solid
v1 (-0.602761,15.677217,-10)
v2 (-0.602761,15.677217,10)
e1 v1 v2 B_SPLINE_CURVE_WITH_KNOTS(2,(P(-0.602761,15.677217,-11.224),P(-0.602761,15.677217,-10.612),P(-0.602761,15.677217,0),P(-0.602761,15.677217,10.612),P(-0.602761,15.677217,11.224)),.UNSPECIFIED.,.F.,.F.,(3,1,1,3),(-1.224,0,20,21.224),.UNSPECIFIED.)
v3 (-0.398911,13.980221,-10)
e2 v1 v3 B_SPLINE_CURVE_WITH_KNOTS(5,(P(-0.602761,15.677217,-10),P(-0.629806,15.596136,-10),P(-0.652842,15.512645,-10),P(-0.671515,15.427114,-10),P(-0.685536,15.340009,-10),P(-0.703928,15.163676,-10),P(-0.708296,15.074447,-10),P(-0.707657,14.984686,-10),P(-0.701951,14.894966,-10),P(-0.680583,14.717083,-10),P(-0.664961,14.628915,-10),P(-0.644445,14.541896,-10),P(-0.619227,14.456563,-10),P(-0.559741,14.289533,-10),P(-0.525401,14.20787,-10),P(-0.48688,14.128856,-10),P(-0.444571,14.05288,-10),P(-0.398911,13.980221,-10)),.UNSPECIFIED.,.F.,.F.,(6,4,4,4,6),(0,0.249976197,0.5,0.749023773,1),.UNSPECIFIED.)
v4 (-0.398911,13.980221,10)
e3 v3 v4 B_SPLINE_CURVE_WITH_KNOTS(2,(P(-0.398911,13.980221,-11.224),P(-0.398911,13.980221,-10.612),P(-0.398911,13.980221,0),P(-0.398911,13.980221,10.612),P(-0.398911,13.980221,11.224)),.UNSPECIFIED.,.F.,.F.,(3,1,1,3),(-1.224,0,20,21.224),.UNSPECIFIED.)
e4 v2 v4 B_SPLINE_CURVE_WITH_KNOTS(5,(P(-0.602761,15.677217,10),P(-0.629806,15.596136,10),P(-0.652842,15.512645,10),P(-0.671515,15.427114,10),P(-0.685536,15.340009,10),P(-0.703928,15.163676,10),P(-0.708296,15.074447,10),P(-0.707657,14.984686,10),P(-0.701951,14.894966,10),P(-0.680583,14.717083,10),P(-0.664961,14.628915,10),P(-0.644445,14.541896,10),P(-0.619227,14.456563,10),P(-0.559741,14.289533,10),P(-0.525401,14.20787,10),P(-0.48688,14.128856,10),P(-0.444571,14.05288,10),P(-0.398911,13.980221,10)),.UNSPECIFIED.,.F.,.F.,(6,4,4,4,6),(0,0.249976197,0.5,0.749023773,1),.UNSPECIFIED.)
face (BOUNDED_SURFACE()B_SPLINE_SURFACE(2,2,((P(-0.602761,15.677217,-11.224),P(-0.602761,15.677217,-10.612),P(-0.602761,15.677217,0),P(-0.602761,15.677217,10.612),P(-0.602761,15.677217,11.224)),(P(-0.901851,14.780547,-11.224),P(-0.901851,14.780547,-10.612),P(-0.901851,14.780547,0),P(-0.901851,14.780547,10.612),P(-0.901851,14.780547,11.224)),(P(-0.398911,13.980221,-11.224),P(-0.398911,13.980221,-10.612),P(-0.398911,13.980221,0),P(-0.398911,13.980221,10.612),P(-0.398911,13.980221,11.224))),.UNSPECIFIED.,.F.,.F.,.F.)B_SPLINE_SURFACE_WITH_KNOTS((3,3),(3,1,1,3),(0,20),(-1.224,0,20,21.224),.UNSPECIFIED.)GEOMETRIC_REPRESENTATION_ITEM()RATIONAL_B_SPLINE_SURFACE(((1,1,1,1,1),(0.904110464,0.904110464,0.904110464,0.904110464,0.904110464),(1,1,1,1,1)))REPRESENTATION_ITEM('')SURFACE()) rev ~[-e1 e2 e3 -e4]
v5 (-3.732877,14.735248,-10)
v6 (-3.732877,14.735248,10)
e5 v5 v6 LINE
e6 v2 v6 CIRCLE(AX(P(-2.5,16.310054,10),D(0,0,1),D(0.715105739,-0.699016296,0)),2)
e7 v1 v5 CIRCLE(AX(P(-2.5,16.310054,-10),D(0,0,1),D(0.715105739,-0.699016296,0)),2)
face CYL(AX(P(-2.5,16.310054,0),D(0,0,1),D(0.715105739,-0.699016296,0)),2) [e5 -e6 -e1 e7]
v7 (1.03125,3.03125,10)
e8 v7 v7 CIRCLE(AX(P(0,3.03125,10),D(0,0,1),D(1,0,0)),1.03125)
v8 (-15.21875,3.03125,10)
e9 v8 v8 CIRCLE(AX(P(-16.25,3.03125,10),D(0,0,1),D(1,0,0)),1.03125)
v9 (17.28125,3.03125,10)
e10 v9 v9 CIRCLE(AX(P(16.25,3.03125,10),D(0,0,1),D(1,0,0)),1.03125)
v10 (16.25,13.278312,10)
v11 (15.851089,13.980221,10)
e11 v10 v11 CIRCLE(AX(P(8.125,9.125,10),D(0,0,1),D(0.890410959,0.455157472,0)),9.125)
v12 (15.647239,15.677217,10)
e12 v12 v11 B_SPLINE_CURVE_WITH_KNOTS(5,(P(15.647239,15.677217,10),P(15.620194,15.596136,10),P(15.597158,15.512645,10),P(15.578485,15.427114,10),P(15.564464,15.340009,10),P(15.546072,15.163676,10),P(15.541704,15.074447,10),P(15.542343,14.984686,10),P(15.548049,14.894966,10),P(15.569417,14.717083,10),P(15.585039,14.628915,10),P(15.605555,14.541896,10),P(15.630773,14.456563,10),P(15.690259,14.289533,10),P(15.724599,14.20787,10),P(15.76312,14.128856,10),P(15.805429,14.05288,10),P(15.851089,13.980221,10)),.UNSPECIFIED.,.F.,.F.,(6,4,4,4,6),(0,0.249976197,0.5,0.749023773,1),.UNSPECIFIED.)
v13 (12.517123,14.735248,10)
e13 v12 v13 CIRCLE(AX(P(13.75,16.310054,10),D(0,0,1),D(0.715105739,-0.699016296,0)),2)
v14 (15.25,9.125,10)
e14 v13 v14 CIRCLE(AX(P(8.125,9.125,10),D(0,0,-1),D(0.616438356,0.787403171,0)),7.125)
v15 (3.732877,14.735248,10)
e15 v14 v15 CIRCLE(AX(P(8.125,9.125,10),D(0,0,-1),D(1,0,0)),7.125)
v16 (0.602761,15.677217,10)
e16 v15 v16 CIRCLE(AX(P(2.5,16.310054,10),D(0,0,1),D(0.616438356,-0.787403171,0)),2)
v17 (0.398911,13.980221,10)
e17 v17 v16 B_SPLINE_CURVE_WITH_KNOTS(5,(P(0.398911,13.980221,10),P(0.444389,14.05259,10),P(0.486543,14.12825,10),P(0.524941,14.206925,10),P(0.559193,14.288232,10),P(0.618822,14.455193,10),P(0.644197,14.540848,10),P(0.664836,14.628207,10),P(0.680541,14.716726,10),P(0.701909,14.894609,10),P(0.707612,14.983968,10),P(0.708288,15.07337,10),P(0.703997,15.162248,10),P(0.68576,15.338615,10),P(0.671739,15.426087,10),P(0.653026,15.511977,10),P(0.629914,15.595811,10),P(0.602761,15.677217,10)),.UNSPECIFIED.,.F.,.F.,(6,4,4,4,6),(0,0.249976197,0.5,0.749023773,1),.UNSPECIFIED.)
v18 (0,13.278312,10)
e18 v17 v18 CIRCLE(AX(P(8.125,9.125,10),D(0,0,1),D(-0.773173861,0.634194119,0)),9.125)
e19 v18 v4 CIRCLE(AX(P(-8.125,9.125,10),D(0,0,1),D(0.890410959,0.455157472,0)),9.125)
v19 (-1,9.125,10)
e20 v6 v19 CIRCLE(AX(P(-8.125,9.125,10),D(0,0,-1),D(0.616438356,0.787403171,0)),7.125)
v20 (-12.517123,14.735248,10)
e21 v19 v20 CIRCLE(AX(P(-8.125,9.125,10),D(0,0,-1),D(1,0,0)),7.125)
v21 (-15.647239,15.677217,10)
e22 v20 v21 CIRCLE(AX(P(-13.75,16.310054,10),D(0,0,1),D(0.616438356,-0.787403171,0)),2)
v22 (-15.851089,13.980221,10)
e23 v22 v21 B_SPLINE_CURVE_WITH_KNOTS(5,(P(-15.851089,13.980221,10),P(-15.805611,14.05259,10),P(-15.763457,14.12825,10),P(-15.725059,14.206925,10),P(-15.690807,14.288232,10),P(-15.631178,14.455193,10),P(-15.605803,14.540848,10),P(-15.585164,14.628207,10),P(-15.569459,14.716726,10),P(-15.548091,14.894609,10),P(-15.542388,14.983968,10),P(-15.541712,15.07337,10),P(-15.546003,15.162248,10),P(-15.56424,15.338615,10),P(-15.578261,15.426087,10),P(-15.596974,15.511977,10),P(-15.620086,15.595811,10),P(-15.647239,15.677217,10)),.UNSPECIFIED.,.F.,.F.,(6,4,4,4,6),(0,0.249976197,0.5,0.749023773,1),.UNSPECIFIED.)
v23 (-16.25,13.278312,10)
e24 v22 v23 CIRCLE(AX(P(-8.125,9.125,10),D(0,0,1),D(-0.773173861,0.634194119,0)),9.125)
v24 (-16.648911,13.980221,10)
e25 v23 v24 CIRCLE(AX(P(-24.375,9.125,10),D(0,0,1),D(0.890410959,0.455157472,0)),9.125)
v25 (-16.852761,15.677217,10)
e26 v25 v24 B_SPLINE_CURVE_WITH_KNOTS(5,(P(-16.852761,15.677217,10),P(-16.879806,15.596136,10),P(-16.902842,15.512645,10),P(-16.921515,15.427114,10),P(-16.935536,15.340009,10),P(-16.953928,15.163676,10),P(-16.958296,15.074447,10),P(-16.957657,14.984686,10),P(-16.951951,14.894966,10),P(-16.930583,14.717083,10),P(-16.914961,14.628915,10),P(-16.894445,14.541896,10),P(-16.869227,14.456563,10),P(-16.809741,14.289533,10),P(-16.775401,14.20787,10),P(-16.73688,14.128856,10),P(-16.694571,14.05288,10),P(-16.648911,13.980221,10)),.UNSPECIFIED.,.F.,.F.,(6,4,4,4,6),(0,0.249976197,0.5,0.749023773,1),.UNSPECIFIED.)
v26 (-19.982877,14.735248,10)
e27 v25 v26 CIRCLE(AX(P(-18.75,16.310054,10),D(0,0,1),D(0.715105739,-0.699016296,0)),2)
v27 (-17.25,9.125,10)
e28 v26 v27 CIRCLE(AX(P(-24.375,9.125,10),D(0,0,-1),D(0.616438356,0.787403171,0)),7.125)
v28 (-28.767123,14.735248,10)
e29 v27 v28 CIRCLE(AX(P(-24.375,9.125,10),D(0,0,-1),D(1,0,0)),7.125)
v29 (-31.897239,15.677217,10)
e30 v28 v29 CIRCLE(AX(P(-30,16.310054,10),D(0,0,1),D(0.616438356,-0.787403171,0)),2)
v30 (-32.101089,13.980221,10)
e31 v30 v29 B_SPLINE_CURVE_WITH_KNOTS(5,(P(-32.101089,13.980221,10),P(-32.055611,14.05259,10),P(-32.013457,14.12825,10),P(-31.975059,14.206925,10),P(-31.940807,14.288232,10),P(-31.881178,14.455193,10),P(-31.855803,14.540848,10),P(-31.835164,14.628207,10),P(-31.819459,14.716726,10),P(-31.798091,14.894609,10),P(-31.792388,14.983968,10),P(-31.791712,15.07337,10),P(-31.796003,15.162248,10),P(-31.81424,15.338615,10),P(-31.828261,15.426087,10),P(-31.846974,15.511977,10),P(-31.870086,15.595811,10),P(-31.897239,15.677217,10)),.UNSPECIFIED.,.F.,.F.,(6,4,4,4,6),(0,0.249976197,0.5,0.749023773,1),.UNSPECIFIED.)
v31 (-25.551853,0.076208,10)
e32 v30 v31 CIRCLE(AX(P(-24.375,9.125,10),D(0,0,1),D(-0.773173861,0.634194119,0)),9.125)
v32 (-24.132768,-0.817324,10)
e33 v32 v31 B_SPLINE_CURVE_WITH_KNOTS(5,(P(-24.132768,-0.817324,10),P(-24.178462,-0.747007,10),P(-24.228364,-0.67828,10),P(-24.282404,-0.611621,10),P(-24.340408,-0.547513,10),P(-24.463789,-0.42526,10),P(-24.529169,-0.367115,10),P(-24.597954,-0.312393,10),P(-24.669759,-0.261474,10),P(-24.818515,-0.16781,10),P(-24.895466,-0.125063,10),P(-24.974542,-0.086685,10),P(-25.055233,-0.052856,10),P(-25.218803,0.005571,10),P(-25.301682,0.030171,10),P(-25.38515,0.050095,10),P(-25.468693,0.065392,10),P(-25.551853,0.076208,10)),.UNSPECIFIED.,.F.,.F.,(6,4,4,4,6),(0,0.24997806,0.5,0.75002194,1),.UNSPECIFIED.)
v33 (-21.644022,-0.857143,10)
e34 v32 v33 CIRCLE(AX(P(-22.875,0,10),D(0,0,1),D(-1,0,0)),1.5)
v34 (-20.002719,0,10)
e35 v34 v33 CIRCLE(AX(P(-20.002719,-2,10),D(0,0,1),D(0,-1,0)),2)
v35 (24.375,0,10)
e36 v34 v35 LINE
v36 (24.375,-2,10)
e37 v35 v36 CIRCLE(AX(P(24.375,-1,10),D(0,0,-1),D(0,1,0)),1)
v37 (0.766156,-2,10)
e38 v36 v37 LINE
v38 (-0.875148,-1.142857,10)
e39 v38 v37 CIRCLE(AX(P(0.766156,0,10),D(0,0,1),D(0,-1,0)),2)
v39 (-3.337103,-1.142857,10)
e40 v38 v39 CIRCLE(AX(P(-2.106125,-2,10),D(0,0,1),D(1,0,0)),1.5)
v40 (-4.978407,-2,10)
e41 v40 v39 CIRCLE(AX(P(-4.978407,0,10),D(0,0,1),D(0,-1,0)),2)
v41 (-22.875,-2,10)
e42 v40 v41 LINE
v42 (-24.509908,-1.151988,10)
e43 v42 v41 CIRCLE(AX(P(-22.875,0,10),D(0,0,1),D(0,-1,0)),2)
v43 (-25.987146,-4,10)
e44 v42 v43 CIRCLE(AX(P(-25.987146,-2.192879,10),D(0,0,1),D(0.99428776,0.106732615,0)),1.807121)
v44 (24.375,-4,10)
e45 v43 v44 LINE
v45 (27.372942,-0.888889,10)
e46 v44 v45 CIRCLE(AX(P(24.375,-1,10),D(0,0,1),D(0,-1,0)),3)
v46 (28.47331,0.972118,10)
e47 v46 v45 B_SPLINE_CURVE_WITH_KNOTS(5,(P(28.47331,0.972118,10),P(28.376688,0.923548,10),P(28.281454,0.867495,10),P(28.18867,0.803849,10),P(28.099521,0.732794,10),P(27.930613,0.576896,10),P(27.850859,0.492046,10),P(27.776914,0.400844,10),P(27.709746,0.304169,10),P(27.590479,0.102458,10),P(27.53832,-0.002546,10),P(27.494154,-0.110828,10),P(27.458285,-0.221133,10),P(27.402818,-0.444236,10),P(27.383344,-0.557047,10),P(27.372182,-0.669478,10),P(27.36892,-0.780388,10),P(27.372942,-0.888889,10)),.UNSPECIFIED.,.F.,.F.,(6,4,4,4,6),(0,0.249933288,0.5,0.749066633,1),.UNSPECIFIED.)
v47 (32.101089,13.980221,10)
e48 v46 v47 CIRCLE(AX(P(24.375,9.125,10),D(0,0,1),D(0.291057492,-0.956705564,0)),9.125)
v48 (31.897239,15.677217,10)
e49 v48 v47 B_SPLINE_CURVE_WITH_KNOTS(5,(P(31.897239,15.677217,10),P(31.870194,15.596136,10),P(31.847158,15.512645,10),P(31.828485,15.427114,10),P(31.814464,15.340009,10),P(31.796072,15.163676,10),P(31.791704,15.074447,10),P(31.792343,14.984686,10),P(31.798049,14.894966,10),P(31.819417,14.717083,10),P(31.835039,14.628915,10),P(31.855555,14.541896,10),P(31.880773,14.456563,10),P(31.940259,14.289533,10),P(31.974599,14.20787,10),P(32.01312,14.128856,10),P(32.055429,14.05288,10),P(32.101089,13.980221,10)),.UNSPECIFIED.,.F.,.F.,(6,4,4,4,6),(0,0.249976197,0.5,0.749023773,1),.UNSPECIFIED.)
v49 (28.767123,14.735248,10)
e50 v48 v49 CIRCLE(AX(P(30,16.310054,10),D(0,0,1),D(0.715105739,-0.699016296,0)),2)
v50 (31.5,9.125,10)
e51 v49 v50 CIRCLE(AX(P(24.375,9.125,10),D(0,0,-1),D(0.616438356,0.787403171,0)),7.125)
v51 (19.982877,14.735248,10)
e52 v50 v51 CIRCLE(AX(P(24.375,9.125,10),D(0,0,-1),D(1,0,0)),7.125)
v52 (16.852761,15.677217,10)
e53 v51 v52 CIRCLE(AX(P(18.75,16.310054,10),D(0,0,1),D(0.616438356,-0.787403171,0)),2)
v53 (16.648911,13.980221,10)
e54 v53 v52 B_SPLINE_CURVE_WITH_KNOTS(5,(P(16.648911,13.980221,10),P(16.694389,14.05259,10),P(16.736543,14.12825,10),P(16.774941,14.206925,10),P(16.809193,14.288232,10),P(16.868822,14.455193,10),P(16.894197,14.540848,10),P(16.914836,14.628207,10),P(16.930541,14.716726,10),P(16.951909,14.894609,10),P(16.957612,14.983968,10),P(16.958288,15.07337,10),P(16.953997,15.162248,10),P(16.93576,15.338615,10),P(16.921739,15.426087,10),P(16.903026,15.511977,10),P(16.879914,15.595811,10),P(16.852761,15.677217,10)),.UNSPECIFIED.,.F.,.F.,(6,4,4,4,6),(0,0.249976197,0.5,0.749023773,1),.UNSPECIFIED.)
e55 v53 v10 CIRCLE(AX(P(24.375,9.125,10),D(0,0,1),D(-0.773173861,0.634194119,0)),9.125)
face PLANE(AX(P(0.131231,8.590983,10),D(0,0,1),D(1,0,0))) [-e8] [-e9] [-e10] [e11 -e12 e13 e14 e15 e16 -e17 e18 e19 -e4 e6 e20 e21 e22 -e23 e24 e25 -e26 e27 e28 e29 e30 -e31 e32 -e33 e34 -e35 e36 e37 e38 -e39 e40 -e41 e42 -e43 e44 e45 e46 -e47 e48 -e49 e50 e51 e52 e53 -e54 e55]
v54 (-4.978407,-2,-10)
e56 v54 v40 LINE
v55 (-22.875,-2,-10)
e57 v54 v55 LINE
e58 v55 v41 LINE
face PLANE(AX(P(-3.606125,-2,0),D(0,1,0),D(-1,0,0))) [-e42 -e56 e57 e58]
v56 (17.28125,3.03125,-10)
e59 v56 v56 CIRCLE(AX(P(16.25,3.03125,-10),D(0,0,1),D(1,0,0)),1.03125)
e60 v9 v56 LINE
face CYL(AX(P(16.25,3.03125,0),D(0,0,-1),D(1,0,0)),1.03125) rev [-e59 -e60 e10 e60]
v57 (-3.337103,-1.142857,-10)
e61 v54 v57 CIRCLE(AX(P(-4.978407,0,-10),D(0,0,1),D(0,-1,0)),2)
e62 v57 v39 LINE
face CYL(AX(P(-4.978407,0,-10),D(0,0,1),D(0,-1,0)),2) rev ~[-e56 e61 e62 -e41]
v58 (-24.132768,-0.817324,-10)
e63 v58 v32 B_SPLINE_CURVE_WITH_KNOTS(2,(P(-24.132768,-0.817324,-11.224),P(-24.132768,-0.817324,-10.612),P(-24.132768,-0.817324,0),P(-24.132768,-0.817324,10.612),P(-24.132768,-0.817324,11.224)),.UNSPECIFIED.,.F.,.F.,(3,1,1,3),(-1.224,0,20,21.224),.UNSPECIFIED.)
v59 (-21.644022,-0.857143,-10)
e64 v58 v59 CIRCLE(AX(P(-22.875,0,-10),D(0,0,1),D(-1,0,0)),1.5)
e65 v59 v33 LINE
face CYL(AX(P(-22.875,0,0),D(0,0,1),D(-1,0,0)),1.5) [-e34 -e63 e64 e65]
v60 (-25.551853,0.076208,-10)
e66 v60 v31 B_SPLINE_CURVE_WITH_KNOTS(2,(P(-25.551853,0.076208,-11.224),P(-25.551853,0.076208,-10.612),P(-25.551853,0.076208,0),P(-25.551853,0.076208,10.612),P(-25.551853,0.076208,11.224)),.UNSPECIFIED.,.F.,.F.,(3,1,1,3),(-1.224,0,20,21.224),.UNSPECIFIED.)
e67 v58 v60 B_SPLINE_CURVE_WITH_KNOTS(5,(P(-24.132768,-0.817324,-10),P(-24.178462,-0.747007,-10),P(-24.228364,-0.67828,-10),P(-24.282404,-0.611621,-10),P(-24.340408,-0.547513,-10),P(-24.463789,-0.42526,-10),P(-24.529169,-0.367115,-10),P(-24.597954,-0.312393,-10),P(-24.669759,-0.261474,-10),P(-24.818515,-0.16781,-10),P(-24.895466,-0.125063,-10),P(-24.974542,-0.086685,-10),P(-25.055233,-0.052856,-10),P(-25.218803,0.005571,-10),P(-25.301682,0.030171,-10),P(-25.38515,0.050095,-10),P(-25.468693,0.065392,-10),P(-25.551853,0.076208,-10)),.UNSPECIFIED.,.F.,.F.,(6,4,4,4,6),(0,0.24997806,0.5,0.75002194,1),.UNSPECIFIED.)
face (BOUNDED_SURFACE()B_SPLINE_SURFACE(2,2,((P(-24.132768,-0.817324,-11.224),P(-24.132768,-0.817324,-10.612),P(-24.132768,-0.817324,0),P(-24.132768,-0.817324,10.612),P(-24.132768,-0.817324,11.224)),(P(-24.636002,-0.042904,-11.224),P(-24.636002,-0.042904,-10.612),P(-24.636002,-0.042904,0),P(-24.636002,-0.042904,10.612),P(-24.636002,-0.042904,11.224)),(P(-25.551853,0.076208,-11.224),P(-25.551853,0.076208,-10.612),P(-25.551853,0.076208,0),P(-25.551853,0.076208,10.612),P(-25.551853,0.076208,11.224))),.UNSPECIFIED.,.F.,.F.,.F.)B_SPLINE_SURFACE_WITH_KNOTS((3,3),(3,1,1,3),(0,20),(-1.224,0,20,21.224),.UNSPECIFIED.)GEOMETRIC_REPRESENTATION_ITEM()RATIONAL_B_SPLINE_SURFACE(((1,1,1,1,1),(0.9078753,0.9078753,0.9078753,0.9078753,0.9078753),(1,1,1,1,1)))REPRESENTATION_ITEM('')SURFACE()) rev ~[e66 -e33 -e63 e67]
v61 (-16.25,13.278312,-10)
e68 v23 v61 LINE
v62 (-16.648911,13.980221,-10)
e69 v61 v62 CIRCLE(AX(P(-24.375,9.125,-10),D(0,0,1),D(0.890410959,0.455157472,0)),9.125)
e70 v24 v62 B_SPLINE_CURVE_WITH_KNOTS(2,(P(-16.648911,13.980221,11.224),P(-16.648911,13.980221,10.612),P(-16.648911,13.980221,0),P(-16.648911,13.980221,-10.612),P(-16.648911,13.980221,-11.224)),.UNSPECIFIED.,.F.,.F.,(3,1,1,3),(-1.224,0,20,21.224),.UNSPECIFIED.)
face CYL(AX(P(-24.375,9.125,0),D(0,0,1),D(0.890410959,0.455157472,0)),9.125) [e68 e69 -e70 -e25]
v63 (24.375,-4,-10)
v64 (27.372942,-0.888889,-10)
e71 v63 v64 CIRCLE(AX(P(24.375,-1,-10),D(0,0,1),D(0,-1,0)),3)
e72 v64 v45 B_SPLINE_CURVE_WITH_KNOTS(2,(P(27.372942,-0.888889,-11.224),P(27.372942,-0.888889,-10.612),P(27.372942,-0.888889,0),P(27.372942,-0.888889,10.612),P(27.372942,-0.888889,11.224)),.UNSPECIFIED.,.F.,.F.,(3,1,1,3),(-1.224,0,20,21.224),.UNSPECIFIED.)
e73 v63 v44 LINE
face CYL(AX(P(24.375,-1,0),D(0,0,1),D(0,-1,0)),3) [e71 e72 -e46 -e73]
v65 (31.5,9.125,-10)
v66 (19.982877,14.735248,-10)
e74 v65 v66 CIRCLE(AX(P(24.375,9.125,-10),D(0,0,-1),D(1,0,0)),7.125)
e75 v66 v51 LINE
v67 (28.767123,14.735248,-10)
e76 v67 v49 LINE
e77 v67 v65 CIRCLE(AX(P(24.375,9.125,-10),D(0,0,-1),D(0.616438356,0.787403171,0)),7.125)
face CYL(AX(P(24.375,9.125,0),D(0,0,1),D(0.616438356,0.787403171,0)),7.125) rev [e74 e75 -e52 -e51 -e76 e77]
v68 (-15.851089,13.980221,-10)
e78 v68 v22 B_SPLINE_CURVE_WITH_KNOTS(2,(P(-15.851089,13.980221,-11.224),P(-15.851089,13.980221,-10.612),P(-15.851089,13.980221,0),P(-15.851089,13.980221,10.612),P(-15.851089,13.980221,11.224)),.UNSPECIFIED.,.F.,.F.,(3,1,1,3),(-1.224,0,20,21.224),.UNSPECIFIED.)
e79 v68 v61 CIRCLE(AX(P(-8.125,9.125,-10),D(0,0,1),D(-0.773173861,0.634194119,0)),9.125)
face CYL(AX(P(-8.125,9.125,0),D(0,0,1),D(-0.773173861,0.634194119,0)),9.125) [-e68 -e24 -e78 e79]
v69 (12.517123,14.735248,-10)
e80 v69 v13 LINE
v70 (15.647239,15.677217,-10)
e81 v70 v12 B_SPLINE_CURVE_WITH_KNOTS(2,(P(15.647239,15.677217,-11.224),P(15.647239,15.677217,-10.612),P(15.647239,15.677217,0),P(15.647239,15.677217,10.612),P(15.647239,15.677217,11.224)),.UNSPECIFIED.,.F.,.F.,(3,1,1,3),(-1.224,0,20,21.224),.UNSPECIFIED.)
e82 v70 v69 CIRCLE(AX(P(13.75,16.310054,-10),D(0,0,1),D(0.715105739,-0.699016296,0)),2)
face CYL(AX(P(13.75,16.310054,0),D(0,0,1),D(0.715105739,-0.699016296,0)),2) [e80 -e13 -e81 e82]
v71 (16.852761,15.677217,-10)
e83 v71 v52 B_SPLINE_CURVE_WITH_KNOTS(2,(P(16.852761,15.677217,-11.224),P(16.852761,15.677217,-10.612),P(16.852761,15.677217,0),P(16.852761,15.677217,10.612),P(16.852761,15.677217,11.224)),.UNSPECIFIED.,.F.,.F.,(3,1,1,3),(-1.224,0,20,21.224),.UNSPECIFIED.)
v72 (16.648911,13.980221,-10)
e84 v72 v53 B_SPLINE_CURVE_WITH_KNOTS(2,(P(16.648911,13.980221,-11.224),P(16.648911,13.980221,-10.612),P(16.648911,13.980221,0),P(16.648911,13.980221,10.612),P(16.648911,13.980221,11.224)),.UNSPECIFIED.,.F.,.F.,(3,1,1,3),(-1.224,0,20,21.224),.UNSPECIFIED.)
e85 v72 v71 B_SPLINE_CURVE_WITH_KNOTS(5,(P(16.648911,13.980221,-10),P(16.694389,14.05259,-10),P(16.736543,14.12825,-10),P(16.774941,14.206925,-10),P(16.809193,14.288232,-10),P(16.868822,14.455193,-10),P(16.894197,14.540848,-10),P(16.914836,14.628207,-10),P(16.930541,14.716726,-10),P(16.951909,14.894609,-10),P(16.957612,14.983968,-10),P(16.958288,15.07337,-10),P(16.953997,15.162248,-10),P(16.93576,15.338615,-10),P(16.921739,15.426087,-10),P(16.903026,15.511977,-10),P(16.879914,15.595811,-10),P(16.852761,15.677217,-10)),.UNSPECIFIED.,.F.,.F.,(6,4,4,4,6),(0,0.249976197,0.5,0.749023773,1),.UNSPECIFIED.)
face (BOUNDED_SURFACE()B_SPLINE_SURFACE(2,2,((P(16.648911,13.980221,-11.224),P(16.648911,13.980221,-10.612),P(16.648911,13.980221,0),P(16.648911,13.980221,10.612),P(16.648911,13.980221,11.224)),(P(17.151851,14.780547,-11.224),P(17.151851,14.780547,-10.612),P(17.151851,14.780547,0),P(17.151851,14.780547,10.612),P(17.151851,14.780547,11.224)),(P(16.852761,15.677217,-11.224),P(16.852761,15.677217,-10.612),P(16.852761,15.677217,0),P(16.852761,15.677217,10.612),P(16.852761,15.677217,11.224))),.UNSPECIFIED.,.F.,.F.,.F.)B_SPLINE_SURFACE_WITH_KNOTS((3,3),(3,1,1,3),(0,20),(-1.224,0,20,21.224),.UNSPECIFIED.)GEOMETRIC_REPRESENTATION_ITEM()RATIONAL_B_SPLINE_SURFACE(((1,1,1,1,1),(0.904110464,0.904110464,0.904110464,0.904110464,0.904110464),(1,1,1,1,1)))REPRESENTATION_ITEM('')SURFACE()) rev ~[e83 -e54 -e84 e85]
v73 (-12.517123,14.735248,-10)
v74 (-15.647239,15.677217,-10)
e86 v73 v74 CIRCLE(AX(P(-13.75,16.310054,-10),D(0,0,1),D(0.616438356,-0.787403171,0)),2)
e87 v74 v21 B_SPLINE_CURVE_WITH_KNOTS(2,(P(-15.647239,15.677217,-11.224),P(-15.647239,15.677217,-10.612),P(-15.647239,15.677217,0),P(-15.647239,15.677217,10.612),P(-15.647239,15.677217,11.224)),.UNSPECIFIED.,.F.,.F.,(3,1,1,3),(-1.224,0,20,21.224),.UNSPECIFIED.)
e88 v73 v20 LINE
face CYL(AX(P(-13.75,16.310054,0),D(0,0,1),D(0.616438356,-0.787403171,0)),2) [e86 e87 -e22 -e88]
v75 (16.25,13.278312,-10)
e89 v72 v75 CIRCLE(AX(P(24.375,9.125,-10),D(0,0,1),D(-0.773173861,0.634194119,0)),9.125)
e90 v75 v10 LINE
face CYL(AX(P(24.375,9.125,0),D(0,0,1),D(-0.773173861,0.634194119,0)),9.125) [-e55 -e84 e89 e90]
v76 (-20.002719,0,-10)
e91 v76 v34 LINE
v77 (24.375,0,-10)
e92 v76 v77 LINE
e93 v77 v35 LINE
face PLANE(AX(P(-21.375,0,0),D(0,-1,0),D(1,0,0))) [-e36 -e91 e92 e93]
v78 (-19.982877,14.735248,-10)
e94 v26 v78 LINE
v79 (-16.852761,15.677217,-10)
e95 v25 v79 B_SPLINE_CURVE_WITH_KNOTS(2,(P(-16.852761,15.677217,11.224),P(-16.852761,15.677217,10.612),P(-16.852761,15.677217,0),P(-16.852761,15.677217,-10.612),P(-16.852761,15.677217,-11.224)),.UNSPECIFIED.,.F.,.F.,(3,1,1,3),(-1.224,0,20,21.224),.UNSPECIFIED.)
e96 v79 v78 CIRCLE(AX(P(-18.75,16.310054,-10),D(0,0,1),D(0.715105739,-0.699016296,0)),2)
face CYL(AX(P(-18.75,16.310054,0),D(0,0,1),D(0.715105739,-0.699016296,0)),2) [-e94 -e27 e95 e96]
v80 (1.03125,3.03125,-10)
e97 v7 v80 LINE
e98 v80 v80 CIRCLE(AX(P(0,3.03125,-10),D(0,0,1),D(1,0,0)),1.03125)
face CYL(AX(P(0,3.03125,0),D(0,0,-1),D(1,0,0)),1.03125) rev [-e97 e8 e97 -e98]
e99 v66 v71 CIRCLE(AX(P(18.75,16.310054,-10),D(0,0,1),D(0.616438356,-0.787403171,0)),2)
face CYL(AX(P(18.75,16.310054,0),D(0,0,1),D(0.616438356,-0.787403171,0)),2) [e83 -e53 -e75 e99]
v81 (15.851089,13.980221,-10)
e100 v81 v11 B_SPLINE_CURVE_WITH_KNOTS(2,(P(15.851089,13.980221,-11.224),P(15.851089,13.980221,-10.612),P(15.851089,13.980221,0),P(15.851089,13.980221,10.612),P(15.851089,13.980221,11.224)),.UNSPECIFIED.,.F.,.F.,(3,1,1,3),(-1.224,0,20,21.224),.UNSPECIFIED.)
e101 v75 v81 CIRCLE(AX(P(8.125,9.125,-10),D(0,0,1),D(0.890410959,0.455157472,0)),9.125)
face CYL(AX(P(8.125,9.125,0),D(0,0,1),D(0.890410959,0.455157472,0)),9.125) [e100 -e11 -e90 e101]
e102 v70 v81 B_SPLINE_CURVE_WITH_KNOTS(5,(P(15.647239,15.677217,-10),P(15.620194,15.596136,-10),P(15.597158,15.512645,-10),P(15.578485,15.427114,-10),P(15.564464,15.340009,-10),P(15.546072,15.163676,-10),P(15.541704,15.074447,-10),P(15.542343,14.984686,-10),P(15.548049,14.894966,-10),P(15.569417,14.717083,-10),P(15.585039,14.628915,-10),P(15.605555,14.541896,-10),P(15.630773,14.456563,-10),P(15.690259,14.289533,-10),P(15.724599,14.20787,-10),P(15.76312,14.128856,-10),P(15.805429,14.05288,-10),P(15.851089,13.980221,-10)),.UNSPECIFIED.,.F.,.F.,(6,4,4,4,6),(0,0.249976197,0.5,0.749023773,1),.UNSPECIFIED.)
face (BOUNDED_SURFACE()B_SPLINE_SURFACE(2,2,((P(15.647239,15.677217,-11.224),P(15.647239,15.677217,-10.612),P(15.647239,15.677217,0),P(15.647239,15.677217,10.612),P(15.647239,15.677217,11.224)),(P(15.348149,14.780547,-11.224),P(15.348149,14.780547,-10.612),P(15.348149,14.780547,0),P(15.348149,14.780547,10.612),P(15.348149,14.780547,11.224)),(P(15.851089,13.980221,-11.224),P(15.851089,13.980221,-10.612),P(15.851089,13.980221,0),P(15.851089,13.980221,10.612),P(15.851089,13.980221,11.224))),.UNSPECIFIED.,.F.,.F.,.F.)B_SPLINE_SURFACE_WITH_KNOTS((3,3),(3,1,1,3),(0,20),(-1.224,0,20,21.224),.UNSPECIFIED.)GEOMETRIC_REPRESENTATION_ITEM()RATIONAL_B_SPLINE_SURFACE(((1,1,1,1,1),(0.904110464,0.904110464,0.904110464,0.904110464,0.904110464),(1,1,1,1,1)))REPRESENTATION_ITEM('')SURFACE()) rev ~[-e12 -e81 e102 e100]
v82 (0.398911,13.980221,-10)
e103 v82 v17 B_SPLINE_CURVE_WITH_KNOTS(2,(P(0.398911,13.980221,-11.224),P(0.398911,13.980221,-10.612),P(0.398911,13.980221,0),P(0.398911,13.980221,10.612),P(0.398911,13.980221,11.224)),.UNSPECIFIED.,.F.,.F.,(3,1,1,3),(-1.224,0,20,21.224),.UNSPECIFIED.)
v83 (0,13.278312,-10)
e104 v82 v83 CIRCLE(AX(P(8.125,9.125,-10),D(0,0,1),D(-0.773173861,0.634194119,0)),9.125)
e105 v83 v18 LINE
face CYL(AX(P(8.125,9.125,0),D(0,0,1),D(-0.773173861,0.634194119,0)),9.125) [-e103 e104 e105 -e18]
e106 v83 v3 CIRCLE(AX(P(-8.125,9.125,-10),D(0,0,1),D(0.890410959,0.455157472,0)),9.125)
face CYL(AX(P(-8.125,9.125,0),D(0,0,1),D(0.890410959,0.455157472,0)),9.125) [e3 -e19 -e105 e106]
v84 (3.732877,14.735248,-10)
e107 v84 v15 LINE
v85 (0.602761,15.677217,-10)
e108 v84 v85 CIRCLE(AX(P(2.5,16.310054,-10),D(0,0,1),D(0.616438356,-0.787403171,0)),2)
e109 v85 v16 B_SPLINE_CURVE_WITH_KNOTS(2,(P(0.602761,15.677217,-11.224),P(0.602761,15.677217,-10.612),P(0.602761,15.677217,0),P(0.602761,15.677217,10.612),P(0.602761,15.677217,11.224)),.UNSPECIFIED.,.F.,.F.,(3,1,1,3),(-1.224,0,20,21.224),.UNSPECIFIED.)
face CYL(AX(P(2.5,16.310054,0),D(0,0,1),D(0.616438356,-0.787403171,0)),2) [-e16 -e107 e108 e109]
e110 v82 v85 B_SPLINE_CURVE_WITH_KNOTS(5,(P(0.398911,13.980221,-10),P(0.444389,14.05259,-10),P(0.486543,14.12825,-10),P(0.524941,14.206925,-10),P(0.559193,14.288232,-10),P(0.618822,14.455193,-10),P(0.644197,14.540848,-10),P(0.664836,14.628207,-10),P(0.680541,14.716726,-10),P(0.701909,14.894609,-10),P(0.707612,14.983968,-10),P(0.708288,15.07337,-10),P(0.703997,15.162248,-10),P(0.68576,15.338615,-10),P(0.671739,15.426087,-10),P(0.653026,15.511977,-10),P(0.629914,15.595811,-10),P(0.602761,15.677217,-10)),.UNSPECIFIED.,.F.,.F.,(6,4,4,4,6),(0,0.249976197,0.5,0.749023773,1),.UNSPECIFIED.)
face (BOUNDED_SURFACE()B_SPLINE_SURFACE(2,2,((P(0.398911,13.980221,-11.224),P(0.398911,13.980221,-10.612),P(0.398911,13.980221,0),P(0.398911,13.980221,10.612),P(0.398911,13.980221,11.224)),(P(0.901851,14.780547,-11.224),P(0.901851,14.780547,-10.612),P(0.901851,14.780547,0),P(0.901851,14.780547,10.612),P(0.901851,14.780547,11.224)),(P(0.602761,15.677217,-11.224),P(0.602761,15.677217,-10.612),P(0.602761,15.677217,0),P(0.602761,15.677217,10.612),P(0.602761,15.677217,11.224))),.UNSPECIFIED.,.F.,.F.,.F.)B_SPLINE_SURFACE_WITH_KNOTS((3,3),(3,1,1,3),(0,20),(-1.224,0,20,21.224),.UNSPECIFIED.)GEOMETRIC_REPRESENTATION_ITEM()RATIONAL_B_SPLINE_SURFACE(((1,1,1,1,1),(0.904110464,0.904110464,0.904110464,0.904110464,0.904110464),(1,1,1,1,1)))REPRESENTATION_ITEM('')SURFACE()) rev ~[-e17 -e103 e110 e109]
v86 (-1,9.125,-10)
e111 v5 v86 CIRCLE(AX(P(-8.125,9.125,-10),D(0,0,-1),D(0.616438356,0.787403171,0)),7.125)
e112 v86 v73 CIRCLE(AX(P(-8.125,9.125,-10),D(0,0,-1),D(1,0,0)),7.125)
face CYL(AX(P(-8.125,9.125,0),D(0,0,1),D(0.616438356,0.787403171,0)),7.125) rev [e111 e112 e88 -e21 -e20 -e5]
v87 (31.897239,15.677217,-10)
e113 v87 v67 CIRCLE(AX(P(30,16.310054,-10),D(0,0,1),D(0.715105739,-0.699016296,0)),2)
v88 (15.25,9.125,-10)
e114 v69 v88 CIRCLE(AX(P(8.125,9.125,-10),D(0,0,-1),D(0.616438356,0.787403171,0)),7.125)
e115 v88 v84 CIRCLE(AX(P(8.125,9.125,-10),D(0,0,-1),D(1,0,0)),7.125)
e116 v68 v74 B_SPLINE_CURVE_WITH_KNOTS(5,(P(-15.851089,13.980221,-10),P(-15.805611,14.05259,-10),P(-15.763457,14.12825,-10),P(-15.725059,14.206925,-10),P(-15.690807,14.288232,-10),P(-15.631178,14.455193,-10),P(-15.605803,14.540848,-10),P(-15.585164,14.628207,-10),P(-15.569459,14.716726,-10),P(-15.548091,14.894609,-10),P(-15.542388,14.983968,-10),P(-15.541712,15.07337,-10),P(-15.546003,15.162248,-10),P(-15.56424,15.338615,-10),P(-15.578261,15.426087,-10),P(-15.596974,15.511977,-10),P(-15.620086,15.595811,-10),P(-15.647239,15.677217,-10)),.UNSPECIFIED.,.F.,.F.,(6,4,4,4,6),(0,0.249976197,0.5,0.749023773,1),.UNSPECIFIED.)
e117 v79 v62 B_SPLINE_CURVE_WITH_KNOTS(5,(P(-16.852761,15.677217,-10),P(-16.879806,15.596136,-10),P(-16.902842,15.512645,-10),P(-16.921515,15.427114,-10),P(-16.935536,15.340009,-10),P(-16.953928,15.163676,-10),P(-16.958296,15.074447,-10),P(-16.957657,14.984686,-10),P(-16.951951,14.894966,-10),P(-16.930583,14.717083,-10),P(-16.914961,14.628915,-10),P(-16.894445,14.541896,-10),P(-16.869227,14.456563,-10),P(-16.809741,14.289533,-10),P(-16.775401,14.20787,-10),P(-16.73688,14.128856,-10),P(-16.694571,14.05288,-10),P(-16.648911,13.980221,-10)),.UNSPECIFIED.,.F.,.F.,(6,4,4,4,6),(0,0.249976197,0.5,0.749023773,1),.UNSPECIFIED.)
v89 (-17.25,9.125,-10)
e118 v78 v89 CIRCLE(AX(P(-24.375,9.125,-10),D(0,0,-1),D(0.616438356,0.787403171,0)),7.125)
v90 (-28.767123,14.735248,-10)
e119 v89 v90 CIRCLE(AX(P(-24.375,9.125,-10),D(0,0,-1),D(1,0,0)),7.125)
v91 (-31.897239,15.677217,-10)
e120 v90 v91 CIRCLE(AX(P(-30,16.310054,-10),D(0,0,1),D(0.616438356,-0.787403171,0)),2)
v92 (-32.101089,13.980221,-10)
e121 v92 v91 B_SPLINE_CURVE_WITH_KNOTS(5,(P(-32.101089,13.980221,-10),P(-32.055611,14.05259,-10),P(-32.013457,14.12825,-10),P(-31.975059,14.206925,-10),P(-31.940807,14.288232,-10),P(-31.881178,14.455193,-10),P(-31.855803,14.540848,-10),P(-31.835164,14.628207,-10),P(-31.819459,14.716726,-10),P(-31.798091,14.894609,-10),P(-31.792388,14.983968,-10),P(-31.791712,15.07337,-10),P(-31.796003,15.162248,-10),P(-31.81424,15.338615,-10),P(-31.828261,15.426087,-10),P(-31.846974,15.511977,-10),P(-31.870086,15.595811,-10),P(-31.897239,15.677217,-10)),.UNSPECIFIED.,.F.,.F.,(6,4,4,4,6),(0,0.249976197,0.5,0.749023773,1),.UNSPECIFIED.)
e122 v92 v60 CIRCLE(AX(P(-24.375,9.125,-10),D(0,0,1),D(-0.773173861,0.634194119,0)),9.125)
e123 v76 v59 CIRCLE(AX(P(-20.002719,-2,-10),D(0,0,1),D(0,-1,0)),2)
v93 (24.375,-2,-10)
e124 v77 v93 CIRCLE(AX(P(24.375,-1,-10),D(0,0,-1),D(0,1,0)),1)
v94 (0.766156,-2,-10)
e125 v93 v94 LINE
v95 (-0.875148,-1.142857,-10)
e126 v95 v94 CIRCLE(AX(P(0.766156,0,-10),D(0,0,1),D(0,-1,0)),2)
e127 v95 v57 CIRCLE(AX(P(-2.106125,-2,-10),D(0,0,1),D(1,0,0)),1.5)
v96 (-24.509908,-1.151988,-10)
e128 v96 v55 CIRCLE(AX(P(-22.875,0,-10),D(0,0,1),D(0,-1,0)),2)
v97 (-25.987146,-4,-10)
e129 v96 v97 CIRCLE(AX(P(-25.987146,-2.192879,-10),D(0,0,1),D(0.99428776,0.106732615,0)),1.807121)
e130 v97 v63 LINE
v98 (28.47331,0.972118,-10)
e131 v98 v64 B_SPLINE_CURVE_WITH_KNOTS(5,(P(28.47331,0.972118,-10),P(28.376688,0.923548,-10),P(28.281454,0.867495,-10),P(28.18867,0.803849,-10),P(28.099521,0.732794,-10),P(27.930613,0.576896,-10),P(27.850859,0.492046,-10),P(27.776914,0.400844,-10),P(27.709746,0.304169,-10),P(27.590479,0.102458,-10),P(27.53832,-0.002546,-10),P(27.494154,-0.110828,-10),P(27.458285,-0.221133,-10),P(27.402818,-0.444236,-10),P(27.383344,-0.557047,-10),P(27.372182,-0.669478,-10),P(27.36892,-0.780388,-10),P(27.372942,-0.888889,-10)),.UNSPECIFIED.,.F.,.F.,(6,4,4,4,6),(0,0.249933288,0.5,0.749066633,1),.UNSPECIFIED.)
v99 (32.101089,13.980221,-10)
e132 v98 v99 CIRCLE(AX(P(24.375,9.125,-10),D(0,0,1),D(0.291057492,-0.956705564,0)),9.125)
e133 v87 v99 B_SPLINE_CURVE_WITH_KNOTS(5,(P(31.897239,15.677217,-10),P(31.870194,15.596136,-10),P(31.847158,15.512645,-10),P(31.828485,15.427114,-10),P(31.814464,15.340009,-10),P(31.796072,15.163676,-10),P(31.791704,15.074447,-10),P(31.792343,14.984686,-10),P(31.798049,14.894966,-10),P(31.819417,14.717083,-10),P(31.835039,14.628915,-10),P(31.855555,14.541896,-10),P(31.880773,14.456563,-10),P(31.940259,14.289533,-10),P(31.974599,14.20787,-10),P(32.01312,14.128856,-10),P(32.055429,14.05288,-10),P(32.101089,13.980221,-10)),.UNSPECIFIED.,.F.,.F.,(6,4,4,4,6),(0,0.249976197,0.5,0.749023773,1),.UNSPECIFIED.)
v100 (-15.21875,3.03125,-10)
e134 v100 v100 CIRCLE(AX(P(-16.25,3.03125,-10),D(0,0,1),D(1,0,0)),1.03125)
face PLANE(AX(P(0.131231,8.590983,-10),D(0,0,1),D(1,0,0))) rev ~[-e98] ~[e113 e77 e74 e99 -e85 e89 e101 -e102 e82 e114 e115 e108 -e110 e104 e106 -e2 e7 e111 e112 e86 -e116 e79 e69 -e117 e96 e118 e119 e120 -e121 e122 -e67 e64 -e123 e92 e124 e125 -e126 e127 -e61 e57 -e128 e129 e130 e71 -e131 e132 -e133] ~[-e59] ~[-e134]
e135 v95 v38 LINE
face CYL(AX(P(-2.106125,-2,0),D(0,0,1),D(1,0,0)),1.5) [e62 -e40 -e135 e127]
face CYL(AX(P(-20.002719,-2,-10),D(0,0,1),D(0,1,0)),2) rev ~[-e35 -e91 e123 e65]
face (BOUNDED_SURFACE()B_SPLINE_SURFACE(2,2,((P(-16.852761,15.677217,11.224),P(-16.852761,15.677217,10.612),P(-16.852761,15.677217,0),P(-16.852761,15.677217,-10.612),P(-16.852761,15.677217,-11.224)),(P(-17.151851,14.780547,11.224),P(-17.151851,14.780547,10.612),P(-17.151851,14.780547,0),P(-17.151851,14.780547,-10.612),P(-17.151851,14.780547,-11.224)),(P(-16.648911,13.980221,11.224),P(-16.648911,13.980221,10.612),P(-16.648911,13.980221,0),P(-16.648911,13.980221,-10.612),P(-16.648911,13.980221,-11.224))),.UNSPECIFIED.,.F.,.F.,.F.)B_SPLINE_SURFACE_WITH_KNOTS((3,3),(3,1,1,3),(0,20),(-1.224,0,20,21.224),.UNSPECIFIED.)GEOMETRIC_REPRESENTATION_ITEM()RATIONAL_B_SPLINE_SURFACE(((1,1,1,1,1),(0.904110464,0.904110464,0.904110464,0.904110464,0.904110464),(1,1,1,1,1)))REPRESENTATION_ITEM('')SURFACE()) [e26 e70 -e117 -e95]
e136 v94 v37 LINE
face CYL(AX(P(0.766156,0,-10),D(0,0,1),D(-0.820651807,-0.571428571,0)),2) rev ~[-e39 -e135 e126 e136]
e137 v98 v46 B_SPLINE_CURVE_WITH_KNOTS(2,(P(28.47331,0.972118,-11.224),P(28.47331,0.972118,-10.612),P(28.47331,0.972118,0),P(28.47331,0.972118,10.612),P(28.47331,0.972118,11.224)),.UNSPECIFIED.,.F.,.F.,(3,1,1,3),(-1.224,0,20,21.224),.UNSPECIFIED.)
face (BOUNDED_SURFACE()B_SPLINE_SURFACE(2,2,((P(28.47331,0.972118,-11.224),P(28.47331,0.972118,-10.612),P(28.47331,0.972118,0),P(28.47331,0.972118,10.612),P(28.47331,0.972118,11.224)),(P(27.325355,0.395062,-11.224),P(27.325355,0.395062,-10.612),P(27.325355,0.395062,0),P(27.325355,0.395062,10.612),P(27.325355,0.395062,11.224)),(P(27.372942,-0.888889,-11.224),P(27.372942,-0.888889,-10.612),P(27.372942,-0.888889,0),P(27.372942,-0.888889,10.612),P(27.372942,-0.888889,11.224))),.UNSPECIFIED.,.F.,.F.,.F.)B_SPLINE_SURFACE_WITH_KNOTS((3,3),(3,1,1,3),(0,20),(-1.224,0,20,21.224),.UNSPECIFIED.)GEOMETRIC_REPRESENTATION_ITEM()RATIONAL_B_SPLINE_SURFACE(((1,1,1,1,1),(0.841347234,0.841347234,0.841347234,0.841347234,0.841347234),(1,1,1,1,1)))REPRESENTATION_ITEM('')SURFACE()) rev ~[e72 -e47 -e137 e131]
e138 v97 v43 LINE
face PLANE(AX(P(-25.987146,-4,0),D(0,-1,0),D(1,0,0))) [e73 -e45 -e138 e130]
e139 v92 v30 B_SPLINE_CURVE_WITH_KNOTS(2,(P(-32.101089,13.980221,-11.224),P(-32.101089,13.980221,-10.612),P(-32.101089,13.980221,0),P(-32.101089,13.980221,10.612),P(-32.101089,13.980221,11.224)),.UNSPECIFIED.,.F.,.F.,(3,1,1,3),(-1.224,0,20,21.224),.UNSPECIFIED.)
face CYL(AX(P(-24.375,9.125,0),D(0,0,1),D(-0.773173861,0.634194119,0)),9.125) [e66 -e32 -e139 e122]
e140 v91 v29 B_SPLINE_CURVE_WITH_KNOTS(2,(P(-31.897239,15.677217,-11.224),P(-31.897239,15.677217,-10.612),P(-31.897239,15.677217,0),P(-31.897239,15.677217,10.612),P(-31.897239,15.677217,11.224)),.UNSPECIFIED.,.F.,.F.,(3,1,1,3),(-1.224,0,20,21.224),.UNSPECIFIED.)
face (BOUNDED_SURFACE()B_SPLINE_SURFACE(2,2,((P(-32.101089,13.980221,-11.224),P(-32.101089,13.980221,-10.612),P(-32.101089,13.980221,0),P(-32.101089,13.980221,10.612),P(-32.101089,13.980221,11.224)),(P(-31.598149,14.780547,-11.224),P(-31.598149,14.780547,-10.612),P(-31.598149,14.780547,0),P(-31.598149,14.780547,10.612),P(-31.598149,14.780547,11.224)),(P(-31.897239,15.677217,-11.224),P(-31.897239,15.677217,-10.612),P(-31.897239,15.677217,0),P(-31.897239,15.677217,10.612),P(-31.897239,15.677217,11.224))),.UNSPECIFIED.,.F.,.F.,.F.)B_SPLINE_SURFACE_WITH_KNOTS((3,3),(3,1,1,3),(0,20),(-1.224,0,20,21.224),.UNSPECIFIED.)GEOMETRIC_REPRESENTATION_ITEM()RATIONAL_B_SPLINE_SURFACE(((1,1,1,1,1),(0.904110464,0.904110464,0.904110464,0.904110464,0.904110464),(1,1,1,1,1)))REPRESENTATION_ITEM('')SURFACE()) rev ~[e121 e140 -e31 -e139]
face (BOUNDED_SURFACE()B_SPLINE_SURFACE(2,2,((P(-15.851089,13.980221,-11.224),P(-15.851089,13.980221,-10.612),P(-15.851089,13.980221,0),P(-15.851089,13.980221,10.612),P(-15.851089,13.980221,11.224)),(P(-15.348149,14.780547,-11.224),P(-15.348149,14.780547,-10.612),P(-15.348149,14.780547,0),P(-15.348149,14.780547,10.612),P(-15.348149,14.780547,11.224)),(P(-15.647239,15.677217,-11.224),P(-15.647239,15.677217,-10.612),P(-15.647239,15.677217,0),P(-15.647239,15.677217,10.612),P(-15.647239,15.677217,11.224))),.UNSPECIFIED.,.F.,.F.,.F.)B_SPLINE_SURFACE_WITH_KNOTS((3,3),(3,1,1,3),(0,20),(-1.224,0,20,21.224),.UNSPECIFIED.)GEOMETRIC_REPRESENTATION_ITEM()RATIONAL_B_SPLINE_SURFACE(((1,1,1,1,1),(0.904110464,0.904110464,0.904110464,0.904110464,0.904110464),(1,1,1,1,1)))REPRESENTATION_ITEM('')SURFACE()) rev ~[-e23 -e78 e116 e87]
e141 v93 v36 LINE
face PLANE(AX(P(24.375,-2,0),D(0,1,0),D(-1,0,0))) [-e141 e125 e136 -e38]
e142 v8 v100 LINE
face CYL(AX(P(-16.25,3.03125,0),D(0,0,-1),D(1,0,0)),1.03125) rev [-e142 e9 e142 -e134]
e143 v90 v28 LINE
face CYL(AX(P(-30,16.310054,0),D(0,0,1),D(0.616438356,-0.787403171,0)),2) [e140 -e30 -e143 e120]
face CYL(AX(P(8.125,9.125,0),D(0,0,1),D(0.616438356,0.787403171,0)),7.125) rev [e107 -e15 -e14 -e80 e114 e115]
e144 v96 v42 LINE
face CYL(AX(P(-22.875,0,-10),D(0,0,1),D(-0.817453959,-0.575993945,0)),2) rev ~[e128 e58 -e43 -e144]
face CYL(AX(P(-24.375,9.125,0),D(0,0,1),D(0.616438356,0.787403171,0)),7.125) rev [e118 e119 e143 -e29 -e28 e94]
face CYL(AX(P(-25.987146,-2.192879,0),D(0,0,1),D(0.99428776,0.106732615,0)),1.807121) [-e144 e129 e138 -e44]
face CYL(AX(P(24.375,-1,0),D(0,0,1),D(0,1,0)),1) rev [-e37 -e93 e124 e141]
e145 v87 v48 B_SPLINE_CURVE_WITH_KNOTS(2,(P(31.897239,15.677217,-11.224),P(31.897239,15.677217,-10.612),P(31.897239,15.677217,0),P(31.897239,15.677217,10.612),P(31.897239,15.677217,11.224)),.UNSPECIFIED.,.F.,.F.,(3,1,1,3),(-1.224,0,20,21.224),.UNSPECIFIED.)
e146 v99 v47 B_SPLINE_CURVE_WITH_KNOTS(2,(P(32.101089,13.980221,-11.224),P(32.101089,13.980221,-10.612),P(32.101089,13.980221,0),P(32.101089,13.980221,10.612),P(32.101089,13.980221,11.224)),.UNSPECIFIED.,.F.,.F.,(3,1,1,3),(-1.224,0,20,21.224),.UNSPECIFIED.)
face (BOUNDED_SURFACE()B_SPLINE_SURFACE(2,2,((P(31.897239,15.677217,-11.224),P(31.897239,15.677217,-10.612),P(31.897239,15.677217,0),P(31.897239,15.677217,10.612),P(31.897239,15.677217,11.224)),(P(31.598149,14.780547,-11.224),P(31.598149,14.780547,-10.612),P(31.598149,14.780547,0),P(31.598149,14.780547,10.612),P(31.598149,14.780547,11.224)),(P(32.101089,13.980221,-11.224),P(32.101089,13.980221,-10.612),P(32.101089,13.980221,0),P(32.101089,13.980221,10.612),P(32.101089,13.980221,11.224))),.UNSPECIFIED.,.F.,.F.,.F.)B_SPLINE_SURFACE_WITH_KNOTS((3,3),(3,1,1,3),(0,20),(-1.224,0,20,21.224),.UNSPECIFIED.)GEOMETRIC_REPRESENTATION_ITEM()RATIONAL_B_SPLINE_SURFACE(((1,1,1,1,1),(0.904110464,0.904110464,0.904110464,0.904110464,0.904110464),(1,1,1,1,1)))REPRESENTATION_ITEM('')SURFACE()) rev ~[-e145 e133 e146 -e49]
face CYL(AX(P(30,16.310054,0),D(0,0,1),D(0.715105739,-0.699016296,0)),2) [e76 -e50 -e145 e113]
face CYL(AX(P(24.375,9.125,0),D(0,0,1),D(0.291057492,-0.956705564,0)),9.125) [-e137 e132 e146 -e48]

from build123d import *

# Parameters (mm, degrees)
F1_R     = 1.03125
F2_DEPTH = 10
F3_R     = 2


with BuildPart() as f2:
    # F1 (on Top) → F2 (new body, symmetric)
    with BuildSketch(Plane.XY):
        with BuildLine():
            ThreePointArc((-19.9828767123, 14.7352475904), (-17.9695529655, 12.2452360949), (-17.25, 9.125))
            ThreePointArc((-17.25, 9.125), (-27.4952360949, 2.7195529655), (-28.7671232877, 14.7352475904))
            ThreePointArc((-28.7671232877, 14.7352475904), (-29.8675330526, 18.3056622368), (-31.4302114786, 14.9120213402))
            ThreePointArc((-31.4302114786, 14.9120213402), (-32.6233996851, 5.2224972601), (-24.375, 0))
            Line((-24.375, 0), (-21.375, 0))
            Line((-21.375, 0), (24.375, 0))
            ThreePointArc((24.375, 0), (25.7175606637, 0.099305796), (27.0308996167, 0.3950617284))
            ThreePointArc((27.0308996167, 0.3950617284), (33.107808756, 6.4785540378), (31.4302114786, 14.9120213402))
            ThreePointArc((31.4302114786, 14.9120213402), (29.8675330526, 18.3056622368), (28.7671232877, 14.7352475904))
            ThreePointArc((28.7671232877, 14.7352475904), (30.7804470345, 12.2452360949), (31.5, 9.125))
            ThreePointArc((31.5, 9.125), (21.2547639051, 2.7195529655), (19.9828767123, 14.7352475904))
            ThreePointArc((19.9828767123, 14.7352475904), (18.8824669474, 18.3056622368), (17.3197885214, 14.9120213402))
            ThreePointArc((17.3197885214, 14.9120213402), (16.7410654482, 14.1238666974), (16.25, 13.2783119315))
            ThreePointArc((16.25, 13.2783119315), (15.7589345518, 14.1238666974), (15.1802114786, 14.9120213402))
            ThreePointArc((15.1802114786, 14.9120213402), (13.6175330526, 18.3056622368), (12.5171232877, 14.7352475904))
            ThreePointArc((12.5171232877, 14.7352475904), (14.5304470345, 12.2452360949), (15.25, 9.125))
            ThreePointArc((15.25, 9.125), (5.0047639051, 2.7195529655), (3.7328767123, 14.7352475904))
            ThreePointArc((3.7328767123, 14.7352475904), (2.6324669474, 18.3056622368), (1.0697885214, 14.9120213402))
            ThreePointArc((1.0697885214, 14.9120213402), (0.4910654482, 14.1238666974), (0, 13.2783119315))
            ThreePointArc((0, 13.2783119315), (-0.4910654482, 14.1238666974), (-1.0697885214, 14.9120213402))
            ThreePointArc((-1.0697885214, 14.9120213402), (-2.6324669474, 18.3056622368), (-3.7328767123, 14.7352475904))
            ThreePointArc((-3.7328767123, 14.7352475904), (-1.7195529655, 12.2452360949), (-1, 9.125))
            ThreePointArc((-1, 9.125), (-11.2452360949, 2.7195529655), (-12.5171232877, 14.7352475904))
            ThreePointArc((-12.5171232877, 14.7352475904), (-13.6175330526, 18.3056622368), (-15.1802114786, 14.9120213402))
            ThreePointArc((-15.1802114786, 14.9120213402), (-15.7589345518, 14.1238666974), (-16.25, 13.2783119315))
            ThreePointArc((-16.25, 13.2783119315), (-16.7410654482, 14.1238666974), (-17.3197885214, 14.9120213402))
            ThreePointArc((-17.3197885214, 14.9120213402), (-18.8824669474, 18.3056622368), (-19.9828767123, 14.7352475904))
        make_face()
        with Locations((-16.25, 3.03125)):
            Circle(F1_R, mode=Mode.SUBTRACT)
        with Locations((0, 3.03125)):
            Circle(F1_R, mode=Mode.SUBTRACT)
        with Locations((16.25, 3.03125)):
            Circle(F1_R, mode=Mode.SUBTRACT)
        with BuildLine():
            ThreePointArc((27.0308996167, 0.3950617284), (25.7175606637, 0.099305796), (24.375, 0))
            ThreePointArc((24.375, 0), (25.375, -1), (24.375, -2))
            Line((24.375, -2), (-0.6061253537, -2))
            Line((-0.6061253537, -2), (-3.6061253537, -2))
            Line((-3.6061253537, -2), (-24.1903478035, -2))
            ThreePointArc((-24.1903478035, -2), (-27.3314384085, -0.985167759), (-25.9871463178, -4))
            Line((-25.9871463178, -4), (24.375, -4))
            ThreePointArc((24.375, -4), (26.9426044463, -2.5515822271), (27.0308996167, 0.3950617284))
        make_face()
        with BuildLine():
            Line((-21.375, 0), (-24.375, 0))
            ThreePointArc((-24.375, 0), (-22.875, -1.5), (-21.375, 0))
        make_face()
        with BuildLine():
            Line((-3.6061253537, -2), (-0.6061253537, -2))
            ThreePointArc((-0.6061253537, -2), (-2.1061253537, -0.5), (-3.6061253537, -2))
        make_face()
    extrude(amount=F2_DEPTH, both=True)

    # F3
    f3_edges = [f2.edges().sort_by_distance(p)[0] for p in [
        (31.430211, 14.912021, 0),
        (15.180211, 14.912021, 0),
        (17.319789, 14.912021, 0),
        (1.069789, 14.912021, 0),
        (-15.180211, 14.912021, 0),
        (-31.430211, 14.912021, 0),
        (-17.319789, 14.912021, 0),
        (-1.069789, 14.912021, 0),
        (-24.375, 0, 0),
        (27.0309, 0.395062, 0),
        (-24.190348, -2, 0),
        (-0.606125, -2, 0),
        (-3.606125, -2, 0),
        (-21.375, 0, 0),
    ]]
    fillet(f3_edges, radius=F3_R)


solid = f2.part
